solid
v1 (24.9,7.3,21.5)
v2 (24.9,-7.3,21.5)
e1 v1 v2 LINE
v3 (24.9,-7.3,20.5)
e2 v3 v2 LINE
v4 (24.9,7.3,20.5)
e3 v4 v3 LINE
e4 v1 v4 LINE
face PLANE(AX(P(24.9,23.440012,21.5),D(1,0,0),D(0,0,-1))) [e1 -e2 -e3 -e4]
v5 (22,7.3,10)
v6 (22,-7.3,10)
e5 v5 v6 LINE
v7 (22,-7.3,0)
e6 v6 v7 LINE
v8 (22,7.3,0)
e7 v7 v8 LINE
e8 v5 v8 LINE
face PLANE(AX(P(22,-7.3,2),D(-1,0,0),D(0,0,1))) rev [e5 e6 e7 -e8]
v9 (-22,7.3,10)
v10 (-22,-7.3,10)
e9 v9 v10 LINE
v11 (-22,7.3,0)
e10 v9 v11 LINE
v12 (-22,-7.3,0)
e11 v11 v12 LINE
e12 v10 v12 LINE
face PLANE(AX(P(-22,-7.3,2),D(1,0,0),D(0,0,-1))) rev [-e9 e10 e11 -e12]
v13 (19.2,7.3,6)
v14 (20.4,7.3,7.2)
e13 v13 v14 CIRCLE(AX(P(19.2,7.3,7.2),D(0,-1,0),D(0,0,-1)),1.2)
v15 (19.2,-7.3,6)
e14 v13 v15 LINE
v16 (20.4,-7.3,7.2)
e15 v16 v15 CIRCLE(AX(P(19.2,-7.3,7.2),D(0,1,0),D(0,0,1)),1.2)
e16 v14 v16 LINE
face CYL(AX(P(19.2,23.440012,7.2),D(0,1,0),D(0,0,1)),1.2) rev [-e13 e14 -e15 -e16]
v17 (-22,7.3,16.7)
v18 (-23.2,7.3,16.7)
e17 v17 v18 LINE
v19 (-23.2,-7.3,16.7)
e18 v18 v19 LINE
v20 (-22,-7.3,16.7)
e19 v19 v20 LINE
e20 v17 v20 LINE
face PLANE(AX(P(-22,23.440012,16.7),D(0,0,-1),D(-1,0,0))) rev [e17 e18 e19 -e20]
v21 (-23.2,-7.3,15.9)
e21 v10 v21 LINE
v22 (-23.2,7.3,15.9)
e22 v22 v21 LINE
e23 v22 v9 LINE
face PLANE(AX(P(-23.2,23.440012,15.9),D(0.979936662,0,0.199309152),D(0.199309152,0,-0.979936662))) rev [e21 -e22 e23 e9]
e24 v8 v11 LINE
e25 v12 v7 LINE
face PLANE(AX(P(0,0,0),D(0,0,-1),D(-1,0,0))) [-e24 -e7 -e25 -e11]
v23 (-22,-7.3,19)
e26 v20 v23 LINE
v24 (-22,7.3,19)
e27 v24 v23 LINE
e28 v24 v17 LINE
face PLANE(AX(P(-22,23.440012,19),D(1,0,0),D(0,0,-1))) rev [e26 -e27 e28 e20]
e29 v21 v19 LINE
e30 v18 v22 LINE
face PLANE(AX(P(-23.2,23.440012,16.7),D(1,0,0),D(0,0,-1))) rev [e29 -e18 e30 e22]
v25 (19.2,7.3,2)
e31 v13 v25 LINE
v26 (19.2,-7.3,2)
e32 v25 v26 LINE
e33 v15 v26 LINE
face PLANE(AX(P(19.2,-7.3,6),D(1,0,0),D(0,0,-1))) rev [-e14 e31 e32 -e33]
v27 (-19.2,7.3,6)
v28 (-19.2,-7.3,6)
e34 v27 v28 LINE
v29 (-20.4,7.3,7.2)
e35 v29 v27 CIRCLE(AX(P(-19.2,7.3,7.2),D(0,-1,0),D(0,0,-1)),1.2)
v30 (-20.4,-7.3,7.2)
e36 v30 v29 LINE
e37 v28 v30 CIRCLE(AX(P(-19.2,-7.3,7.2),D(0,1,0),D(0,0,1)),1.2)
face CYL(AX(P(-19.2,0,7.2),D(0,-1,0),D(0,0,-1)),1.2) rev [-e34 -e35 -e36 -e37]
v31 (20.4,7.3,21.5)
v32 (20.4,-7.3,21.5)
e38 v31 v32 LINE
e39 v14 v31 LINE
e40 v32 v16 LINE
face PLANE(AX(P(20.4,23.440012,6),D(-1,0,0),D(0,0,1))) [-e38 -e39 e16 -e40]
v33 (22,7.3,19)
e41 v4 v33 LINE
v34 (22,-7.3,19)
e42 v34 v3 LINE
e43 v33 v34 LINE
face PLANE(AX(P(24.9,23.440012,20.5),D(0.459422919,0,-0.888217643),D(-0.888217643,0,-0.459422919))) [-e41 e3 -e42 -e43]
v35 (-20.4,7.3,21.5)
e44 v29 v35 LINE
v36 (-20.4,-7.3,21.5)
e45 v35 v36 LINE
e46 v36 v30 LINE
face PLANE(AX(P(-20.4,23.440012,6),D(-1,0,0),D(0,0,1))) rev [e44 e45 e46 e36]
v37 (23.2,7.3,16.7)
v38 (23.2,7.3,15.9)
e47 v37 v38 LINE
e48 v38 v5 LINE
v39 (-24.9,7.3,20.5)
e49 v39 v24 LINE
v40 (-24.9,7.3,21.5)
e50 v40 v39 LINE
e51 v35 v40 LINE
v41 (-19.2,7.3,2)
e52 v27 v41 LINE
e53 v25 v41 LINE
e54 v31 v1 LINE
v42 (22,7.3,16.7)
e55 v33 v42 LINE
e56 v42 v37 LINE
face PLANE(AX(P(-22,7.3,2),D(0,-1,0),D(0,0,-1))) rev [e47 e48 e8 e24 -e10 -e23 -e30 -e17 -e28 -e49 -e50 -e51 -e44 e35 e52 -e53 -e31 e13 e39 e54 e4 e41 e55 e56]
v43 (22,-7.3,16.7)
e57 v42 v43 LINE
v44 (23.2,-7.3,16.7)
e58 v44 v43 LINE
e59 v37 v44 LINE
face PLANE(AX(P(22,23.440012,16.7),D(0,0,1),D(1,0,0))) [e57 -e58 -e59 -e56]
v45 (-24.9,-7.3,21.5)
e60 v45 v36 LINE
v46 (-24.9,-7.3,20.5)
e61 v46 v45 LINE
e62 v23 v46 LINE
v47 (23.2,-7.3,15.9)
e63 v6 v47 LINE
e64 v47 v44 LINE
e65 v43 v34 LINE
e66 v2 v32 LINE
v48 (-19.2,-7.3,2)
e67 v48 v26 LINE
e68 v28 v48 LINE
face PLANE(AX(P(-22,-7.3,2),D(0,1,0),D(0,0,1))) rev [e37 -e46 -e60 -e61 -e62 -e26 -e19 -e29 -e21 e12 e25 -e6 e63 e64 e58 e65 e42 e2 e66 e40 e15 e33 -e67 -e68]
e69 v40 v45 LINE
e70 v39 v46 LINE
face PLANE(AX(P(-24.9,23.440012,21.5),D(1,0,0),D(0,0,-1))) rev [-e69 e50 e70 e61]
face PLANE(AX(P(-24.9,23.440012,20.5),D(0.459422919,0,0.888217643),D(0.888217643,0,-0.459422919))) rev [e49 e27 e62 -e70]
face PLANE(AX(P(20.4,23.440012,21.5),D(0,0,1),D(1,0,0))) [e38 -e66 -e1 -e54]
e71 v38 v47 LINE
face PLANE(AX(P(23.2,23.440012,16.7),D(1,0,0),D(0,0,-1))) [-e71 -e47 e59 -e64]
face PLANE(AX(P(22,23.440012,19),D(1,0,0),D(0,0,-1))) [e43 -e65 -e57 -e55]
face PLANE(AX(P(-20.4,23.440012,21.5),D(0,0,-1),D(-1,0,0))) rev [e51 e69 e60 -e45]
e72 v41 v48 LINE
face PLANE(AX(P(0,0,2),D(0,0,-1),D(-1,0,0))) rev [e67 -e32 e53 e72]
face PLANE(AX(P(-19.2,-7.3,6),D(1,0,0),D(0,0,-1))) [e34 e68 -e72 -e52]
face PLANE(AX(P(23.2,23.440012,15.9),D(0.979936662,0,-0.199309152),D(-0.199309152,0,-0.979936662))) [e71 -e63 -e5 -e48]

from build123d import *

# Parameters (mm, degrees)
SKETCH_1_W             = 44
SKETCH_1_H             = 14.6
EXTRUDE_1_DEPTH        = 2
SKETCH_2_W             = 2.8
SKETCH_2_H             = 14.6
EXTRUDE_2_DEPTH        = 4
EXTRUDE_3_DEPTH        = 14.6
FILLET_1_R             = 1.2
FILLET_1_OF_MIRROR_1_R = 1.2


with BuildPart() as part:
    # 草图1 → 凸台-拉伸1 (new body)
    with BuildSketch(Plane.XY):
        Rectangle(SKETCH_1_W, SKETCH_1_H)
    extrude(amount=EXTRUDE_1_DEPTH)

    # 草图2 → 凸台-拉伸2 (add)
    with BuildSketch(Plane.XY.offset(2)):
        with Locations((20.6, 0)):
            Rectangle(SKETCH_2_W, SKETCH_2_H)
    extrude_2 = extrude(amount=EXTRUDE_2_DEPTH)

    # 草图3 → 凸台-拉伸3 (add)
    with BuildSketch(Plane.XZ.offset(7.3)):
        Polygon((22, 6), (20.4, 6), (20.4, 21.5), (24.9, 21.5), (24.9, 20.5), (22, 19), (22, 16.7), (23.2, 16.7), (23.2, 15.9), (22, 10), align=None)
    extrude_3 = extrude(amount=-EXTRUDE_3_DEPTH)

    # 圆角1
    fillet_1_edges = [part.edges().sort_by_distance(p)[0] for p in [
        (20.4, 0, 6),
    ]]
    fillet(fillet_1_edges, radius=FILLET_1_R - 0.0001)  # a hair under: the kernel refuses the full size

    # 镜向1: 凸台-拉伸2, 凸台-拉伸3 across plane
    add(extrude_2.mirror(Plane(origin=(0, 0, 0), x_dir=(0, 0, 1), z_dir=(1, 0, 0))))
    add(extrude_3.mirror(Plane(origin=(0, 0, 0), x_dir=(0, 0, 1), z_dir=(1, 0, 0))))

    # 圆角1 of 镜向1
    fillet_1_of_mirror_1_edges = [part.edges().sort_by_distance(p)[0] for p in [
        (-20.4, 0, 6),
    ]]
    fillet(fillet_1_of_mirror_1_edges, radius=FILLET_1_OF_MIRROR_1_R - 0.0001)  # a hair under: the kernel refuses the full size


solid = part.part
